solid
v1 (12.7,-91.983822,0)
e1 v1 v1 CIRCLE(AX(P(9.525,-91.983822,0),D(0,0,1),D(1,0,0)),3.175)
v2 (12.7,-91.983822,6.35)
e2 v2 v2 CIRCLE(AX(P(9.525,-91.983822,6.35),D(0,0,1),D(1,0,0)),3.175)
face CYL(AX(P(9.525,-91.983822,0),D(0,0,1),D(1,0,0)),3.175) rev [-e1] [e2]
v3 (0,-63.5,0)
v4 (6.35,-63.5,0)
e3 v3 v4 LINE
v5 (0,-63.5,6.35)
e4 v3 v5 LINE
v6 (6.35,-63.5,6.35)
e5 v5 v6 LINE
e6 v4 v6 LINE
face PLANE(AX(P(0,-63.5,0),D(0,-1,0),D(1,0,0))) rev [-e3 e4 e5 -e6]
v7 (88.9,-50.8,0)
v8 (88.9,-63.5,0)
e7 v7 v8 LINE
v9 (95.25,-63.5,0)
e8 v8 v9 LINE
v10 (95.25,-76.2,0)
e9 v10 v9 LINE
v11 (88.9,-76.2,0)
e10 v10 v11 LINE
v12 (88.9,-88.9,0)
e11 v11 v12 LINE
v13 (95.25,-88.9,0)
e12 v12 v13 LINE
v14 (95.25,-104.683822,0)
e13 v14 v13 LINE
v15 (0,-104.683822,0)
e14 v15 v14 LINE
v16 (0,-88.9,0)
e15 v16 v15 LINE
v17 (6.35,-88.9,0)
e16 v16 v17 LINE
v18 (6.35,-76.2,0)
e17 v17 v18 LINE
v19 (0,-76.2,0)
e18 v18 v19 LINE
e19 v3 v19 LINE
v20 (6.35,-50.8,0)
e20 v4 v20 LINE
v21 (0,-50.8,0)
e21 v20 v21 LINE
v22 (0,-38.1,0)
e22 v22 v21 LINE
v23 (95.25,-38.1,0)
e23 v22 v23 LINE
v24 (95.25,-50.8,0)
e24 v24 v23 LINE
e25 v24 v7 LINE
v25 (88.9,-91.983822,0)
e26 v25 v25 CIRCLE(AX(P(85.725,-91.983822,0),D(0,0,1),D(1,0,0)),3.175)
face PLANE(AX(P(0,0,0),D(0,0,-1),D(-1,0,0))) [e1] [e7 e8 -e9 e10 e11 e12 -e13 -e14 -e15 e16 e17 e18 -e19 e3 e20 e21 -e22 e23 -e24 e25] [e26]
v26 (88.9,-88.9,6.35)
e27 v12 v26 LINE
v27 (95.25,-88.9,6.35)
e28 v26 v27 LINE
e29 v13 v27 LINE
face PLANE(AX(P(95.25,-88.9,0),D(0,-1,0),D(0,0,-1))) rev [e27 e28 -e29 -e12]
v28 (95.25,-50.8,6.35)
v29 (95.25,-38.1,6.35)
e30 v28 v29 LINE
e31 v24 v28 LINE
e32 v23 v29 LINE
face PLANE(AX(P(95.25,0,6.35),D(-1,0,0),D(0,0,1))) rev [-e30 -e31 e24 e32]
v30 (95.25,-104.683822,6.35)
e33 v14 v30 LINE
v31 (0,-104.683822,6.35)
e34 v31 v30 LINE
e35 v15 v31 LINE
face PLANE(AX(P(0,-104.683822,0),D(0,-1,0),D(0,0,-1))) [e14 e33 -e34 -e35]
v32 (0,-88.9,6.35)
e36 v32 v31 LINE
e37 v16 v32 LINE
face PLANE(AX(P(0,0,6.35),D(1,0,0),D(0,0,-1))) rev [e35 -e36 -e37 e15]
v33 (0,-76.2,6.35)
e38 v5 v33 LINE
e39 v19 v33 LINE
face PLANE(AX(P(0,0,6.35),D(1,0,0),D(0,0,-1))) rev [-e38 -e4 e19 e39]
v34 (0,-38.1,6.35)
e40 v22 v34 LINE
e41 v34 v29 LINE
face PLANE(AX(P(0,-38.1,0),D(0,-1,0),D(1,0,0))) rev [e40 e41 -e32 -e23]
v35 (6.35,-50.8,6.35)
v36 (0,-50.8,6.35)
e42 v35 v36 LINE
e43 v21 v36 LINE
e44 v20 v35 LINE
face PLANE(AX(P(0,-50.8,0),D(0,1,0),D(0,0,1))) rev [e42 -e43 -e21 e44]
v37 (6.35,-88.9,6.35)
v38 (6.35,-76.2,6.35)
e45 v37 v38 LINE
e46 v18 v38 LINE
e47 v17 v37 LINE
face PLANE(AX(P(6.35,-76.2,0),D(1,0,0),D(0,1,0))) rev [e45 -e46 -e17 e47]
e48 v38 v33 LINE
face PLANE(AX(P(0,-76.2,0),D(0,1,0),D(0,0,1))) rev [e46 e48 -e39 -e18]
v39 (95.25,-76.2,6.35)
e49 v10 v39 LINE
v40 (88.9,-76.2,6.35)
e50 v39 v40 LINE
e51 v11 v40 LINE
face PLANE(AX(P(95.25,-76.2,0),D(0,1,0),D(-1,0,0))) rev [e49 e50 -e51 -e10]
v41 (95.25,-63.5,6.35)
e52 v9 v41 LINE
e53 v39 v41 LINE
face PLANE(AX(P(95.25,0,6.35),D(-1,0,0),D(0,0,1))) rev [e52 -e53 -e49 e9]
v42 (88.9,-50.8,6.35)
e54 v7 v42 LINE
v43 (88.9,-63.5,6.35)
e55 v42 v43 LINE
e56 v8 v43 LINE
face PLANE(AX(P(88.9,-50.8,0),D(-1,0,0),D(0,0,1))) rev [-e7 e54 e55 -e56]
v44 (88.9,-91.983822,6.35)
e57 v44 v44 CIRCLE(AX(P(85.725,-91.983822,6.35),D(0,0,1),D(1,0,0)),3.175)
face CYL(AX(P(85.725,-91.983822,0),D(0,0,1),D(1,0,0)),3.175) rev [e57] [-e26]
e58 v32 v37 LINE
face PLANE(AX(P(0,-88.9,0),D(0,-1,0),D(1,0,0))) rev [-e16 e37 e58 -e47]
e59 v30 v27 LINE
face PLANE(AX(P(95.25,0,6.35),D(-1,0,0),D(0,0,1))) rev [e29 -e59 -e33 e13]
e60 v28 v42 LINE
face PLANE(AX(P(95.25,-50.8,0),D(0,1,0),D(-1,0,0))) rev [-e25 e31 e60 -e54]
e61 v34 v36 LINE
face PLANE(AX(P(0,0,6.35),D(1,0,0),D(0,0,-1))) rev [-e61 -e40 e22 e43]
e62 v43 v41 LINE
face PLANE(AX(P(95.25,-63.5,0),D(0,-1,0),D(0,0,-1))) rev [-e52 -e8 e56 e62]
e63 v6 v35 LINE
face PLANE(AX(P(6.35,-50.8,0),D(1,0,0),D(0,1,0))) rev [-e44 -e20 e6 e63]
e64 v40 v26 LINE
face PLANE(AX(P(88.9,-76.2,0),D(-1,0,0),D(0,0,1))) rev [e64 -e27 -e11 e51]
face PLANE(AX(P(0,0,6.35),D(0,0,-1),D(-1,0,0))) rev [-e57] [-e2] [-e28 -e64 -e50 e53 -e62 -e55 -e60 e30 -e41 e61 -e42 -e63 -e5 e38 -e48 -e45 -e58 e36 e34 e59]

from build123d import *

# Parameters (mm, degrees)
SKETCH2_W           = 95.25
SKETCH2_H           = 305.964286483
BOSS_EXTRUDE1_DEPTH = 6.35
SKETCH3_W           = 6.35
SKETCH3_H           = 12.7
CUT_EXTRUDE1_DEPTH  = 321.51057643
LPATTERN1_COUNT     = 12
LPATTERN1_PITCH     = 25.4
SKETCH4_W           = 15.875
SKETCH4_H           = 6.374255968
SKETCH4_W_2         = 12.7
CUT_EXTRUDE2_DEPTH  = 321.51057643
SKETCH5_W           = 12.7
SKETCH5_H           = 6.929808982
CUT_EXTRUDE3_DEPTH  = 321.51057643
SKETCH8_W           = 95.25
SKETCH8_H           = 0.555553013
CUT_EXTRUDE5_DEPTH  = 321.51057643
SKETCH9_W           = 69.85
SKETCH9_H           = 248.088941691
BOSS_EXTRUDE3_DEPTH = 6.35
CUT_EXTRUDE8_DEPTH  = 321.51057643
FILL_PATTERN1_DEPTH = 6.35
SKETCH9_2_W         = 69.85
SKETCH9_2_H         = 248.088941691
CUT_EXTRUDE9_DEPTH  = 6.35
SKETCH14_W          = 69.85
SKETCH14_H          = 51.238941691
BOSS_EXTRUDE4_DEPTH = 6.35
SKETCH15_W          = 69.85
SKETCH15_H          = 44.888941691
CUT_EXTRUDE11_DEPTH = 6.35
CHAMFER1_SIZE       = 3.175
SKETCH17_W          = 69.85
SKETCH17_H          = 6.35
BOSS_EXTRUDE5_DEPTH = 6.35
SKETCH18_W          = 69.85
SKETCH18_H          = 44.45
CUT_EXTRUDE12_DEPTH = 321.51057643
CHAMFER2_SIZE       = 3.175
SKETCH19_W          = 95.25
SKETCH19_H          = 105.239375395
BOSS_EXTRUDE6_DEPTH = 6.35
LPATTERN2_COUNT     = 5
LPATTERN2_PITCH     = 25.4
SKETCH20_R          = 3.175
CUT_EXTRUDE13_DEPTH = 321.51057643
SKETCH22_R          = 1.75
CUT_EXTRUDE14_DEPTH = 321.51057643
SKETCH23_W          = 95.25
SKETCH23_H          = 344.064286483
CUT_EXTRUDE15_DEPTH = 321.51057643


# Read off the part's stored shape, not the designer's step: Fill Pattern1
with BuildPart() as part:
    # Sketch2 → Boss-Extrude1 (new body)
    with BuildSketch(Plane.XY):
        with Locations((47.625, 152.982143242)):
            Rectangle(SKETCH2_W, SKETCH2_H)
    extrude(amount=BOSS_EXTRUDE1_DEPTH)

    # Sketch3 → Cut-Extrude1 (cut, through all)
    with BuildSketch(Plane.XY.offset(6.35)):
        with Locations((3.175, 19.05)):
            Rectangle(SKETCH3_W, SKETCH3_H)
        with Locations((92.075, 19.05)):
            Rectangle(SKETCH3_W, SKETCH3_H)
    cut_extrude1 = extrude(amount=-CUT_EXTRUDE1_DEPTH, mode=Mode.SUBTRACT)

    # LPattern1: Cut-Extrude1 ×12
    with Locations(*[(0, i * LPATTERN1_PITCH, 0) for i in range(1, LPATTERN1_COUNT)]):
        add(cut_extrude1, mode=Mode.SUBTRACT)

    # Sketch4 → Cut-Extrude2 (cut, through all)
    with BuildSketch(Plane.XY.offset(6.35)):
        with Locations((7.9375, 302.777158499)):
            Rectangle(SKETCH4_W, SKETCH4_H)
        with Locations((34.925, 302.777158499)):
            Rectangle(SKETCH4_W_2, SKETCH4_H)
        with Locations((87.3125, 302.777158499)):
            Rectangle(SKETCH4_W, SKETCH4_H)
        with Locations((60.325, 302.777158499)):
            Rectangle(SKETCH4_W_2, SKETCH4_H)
    extrude(amount=-CUT_EXTRUDE2_DEPTH, mode=Mode.SUBTRACT)

    # Sketch5 → Cut-Extrude3 (cut, through all)
    with BuildSketch(Plane.XY.offset(6.35)):
        with Locations((22.225, 35.336184333)):
            Rectangle(SKETCH5_W, SKETCH5_H)
        with Locations((47.625, 35.336184333)):
            Rectangle(SKETCH5_W, SKETCH5_H)
        with Locations((73.025, 35.336184333)):
            Rectangle(SKETCH5_W, SKETCH5_H)
    extrude(amount=-CUT_EXTRUDE3_DEPTH, mode=Mode.SUBTRACT)

    # Sketch8 → Cut-Extrude5 (cut, through all)
    with BuildSketch(Plane.XY.offset(6.35)):
        with Locations((47.625, 0.277776507)):
            Rectangle(SKETCH8_W, SKETCH8_H)
    extrude(amount=-CUT_EXTRUDE5_DEPTH, mode=Mode.SUBTRACT)

    # Sketch9<2> → Cut-Extrude9 (cut)
    with BuildSketch(Plane.XY.offset(6.35)):
        with Locations((47.625, 169.195559669)):
            Rectangle(SKETCH9_2_W, SKETCH9_2_H)
    extrude(amount=-CUT_EXTRUDE9_DEPTH, mode=Mode.SUBTRACT)


with BuildPart() as body_2:
    # Sketch9 → Boss-Extrude3 (new body)
    with BuildSketch(Plane.XY.offset(6.35)):
        with Locations((47.625, 169.195559669)):
            Rectangle(SKETCH9_W, SKETCH9_H)
    extrude(amount=-BOSS_EXTRUDE3_DEPTH)

    # Sketch12 → Cut-Extrude8 (cut, through all)
    with BuildSketch(Plane.XY.offset(6.35)):
        Polygon((42.125738686, 280.540030515), (36.626477372, 271.015030515), (42.125738686, 261.490030515), (53.124261314, 261.490030515), (58.623522628, 271.015030515), (53.124261314, 280.540030515), align=None)
    extrude(amount=-CUT_EXTRUDE8_DEPTH, mode=Mode.SUBTRACT)

    # Fill Pattern1 outline → Fill Pattern1 (cut)
    with BuildSketch(Plane.XY):
        Polygon((75.12130657, 223.390030515), (80.620567884, 232.915030515), (75.12130657, 242.440030515), (64.122783942, 242.440030515), (58.623522628, 232.915030515), (64.122783942, 223.390030515), align=None)
        Polygon((20.12869343, 223.390030515), (31.127216058, 223.390030515), (36.626477372, 232.915030515), (31.127216058, 242.440030515), (20.12869343, 242.440030515), (14.629432116, 232.915030515), align=None)
        Polygon((12.7, 198.156904969), (12.7, 191.47315606), (14.629432116, 194.815030515), align=None)
        Polygon((14.629432116, 169.415030515), (12.7, 172.756904969), (12.7, 166.07315606), align=None)
        Polygon((12.7, 223.556904969), (12.7, 216.87315606), (14.629432116, 220.215030515), align=None)
        Polygon((14.629432116, 144.015030515), (12.7, 147.356904969), (12.7, 140.67315606), align=None)
        Polygon((12.7, 248.956904969), (12.7, 242.27315606), (14.629432116, 245.615030515), align=None)
        Polygon((14.629432116, 118.615030515), (12.7, 121.956904969), (12.7, 115.27315606), align=None)
        Polygon((12.7, 274.356904969), (12.7, 267.67315606), (14.629432116, 271.015030515), align=None)
        Polygon((14.629432116, 93.215030515), (12.7, 96.556904969), (12.7, 89.87315606), align=None)
        Polygon((12.7, 293.240030515), (12.7, 293.07315606), (12.796345011, 293.240030515), align=None)
        Polygon((14.629432116, 67.815030515), (12.7, 71.156904969), (12.7, 64.47315606), align=None)
        Polygon((31.127216058, 293.240030515), (20.12869343, 293.240030515), (14.629432116, 283.715030515), (20.12869343, 274.190030515), (31.127216058, 274.190030515), (36.626477372, 283.715030515), align=None)
        Polygon((56.790435523, 293.240030515), (38.459564477, 293.240030515), (42.125738686, 286.890030515), (53.124261314, 286.890030515), align=None)
        Polygon((42.125738686, 51.940030515), (38.206141373, 45.151088824), (57.043858627, 45.151088824), (53.124261314, 51.940030515), align=None)
        Polygon((75.12130657, 293.240030515), (64.122783942, 293.240030515), (58.623522628, 283.715030515), (64.122783942, 274.190030515), (75.12130657, 274.190030515), (80.620567884, 283.715030515), align=None)
        Polygon((82.55, 45.756904969), (82.200231885, 45.151088824), (82.55, 45.151088824), align=None)
        Polygon((82.55, 293.240030515), (82.453654989, 293.240030515), (82.55, 293.07315606), align=None)
        Polygon((80.620567884, 67.815030515), (82.55, 64.47315606), (82.55, 71.156904969), align=None)
        Polygon((82.55, 267.67315606), (82.55, 274.356904969), (80.620567884, 271.015030515), align=None)
        Polygon((80.620567884, 93.215030515), (82.55, 89.87315606), (82.55, 96.556904969), align=None)
        Polygon((82.55, 242.27315606), (82.55, 248.956904969), (80.620567884, 245.615030515), align=None)
        Polygon((80.620567884, 118.615030515), (82.55, 115.27315606), (82.55, 121.956904969), align=None)
        Polygon((82.55, 216.87315606), (82.55, 223.556904969), (80.620567884, 220.215030515), align=None)
        Polygon((80.620567884, 144.015030515), (82.55, 140.67315606), (82.55, 147.356904969), align=None)
        Polygon((82.55, 191.47315606), (82.55, 198.156904969), (80.620567884, 194.815030515), align=None)
        Polygon((80.620567884, 169.415030515), (82.55, 166.07315606), (82.55, 172.756904969), align=None)
        Polygon((20.12869343, 248.790030515), (31.127216058, 248.790030515), (36.626477372, 258.315030515), (31.127216058, 267.840030515), (20.12869343, 267.840030515), (14.629432116, 258.315030515), align=None)
        Polygon((64.122783942, 267.840030515), (58.623522628, 258.315030515), (64.122783942, 248.790030515), (75.12130657, 248.790030515), (80.620567884, 258.315030515), (75.12130657, 267.840030515), align=None)
        Polygon((42.125738686, 236.090030515), (53.124261314, 236.090030515), (58.623522628, 245.615030515), (53.124261314, 255.140030515), (42.125738686, 255.140030515), (36.626477372, 245.615030515), align=None)
        Polygon((20.12869343, 197.990030515), (31.127216058, 197.990030515), (36.626477372, 207.515030515), (31.127216058, 217.040030515), (20.12869343, 217.040030515), (14.629432116, 207.515030515), align=None)
        Polygon((53.124261314, 204.340030515), (42.125738686, 204.340030515), (36.626477372, 194.815030515), (42.125738686, 185.290030515), (53.124261314, 185.290030515), (58.623522628, 194.815030515), align=None)
        Polygon((31.127216058, 166.240030515), (20.12869343, 166.240030515), (14.629432116, 156.715030515), (20.12869343, 147.190030515), (31.127216058, 147.190030515), (36.626477372, 156.715030515), align=None)
        Polygon((75.12130657, 197.990030515), (80.620567884, 207.515030515), (75.12130657, 217.040030515), (64.122783942, 217.040030515), (58.623522628, 207.515030515), (64.122783942, 197.990030515), align=None)
        Polygon((42.125738686, 210.690030515), (53.124261314, 210.690030515), (58.623522628, 220.215030515), (53.124261314, 229.740030515), (42.125738686, 229.740030515), (36.626477372, 220.215030515), align=None)
        Polygon((20.12869343, 172.590030515), (31.127216058, 172.590030515), (36.626477372, 182.115030515), (31.127216058, 191.640030515), (20.12869343, 191.640030515), (14.629432116, 182.115030515), align=None)
        Polygon((53.124261314, 178.940030515), (42.125738686, 178.940030515), (36.626477372, 169.415030515), (42.125738686, 159.890030515), (53.124261314, 159.890030515), (58.623522628, 169.415030515), align=None)
        Polygon((31.127216058, 140.840030515), (20.12869343, 140.840030515), (14.629432116, 131.315030515), (20.12869343, 121.790030515), (31.127216058, 121.790030515), (36.626477372, 131.315030515), align=None)
        Polygon((75.12130657, 147.190030515), (80.620567884, 156.715030515), (75.12130657, 166.240030515), (64.122783942, 166.240030515), (58.623522628, 156.715030515), (64.122783942, 147.190030515), align=None)
        Polygon((75.12130657, 172.590030515), (80.620567884, 182.115030515), (75.12130657, 191.640030515), (64.122783942, 191.640030515), (58.623522628, 182.115030515), (64.122783942, 172.590030515), align=None)
        Polygon((53.124261314, 153.540030515), (42.125738686, 153.540030515), (36.626477372, 144.015030515), (42.125738686, 134.490030515), (53.124261314, 134.490030515), (58.623522628, 144.015030515), align=None)
        Polygon((31.127216058, 115.440030515), (20.12869343, 115.440030515), (14.629432116, 105.915030515), (20.12869343, 96.390030515), (31.127216058, 96.390030515), (36.626477372, 105.915030515), align=None)
        Polygon((75.12130657, 121.790030515), (80.620567884, 131.315030515), (75.12130657, 140.840030515), (64.122783942, 140.840030515), (58.623522628, 131.315030515), (64.122783942, 121.790030515), align=None)
        Polygon((53.124261314, 128.140030515), (42.125738686, 128.140030515), (36.626477372, 118.615030515), (42.125738686, 109.090030515), (53.124261314, 109.090030515), (58.623522628, 118.615030515), align=None)
        Polygon((31.127216058, 90.040030515), (20.12869343, 90.040030515), (14.629432116, 80.515030515), (20.12869343, 70.990030515), (31.127216058, 70.990030515), (36.626477372, 80.515030515), align=None)
        Polygon((75.12130657, 96.390030515), (80.620567884, 105.915030515), (75.12130657, 115.440030515), (64.122783942, 115.440030515), (58.623522628, 105.915030515), (64.122783942, 96.390030515), align=None)
        Polygon((53.124261314, 102.740030515), (42.125738686, 102.740030515), (36.626477372, 93.215030515), (42.125738686, 83.690030515), (53.124261314, 83.690030515), (58.623522628, 93.215030515), align=None)
        Polygon((31.127216058, 64.640030515), (20.12869343, 64.640030515), (14.629432116, 55.115030515), (20.12869343, 45.590030515), (31.127216058, 45.590030515), (36.626477372, 55.115030515), align=None)
        Polygon((75.12130657, 70.990030515), (80.620567884, 80.515030515), (75.12130657, 90.040030515), (64.122783942, 90.040030515), (58.623522628, 80.515030515), (64.122783942, 70.990030515), align=None)
        Polygon((53.124261314, 77.340030515), (42.125738686, 77.340030515), (36.626477372, 67.815030515), (42.125738686, 58.290030515), (53.124261314, 58.290030515), (58.623522628, 67.815030515), align=None)
        Polygon((75.12130657, 45.590030515), (80.620567884, 55.115030515), (75.12130657, 64.640030515), (64.122783942, 64.640030515), (58.623522628, 55.115030515), (64.122783942, 45.590030515), align=None)
    extrude(amount=FILL_PATTERN1_DEPTH, mode=Mode.SUBTRACT)

    # Combine1: union part
    add(part.part)

    # Sketch14 → Boss-Extrude4 (add, through all)
    with BuildSketch(Plane.XY.offset(6.35)):
        with Locations((47.625, 70.77055967)):
            Rectangle(SKETCH14_W, SKETCH14_H)
    extrude(amount=-BOSS_EXTRUDE4_DEPTH)

    # Sketch15 → Cut-Extrude11 (cut)
    with BuildSketch(Plane.XY.offset(6.35)):
        with Locations((47.625, 67.59555967)):
            Rectangle(SKETCH15_W, SKETCH15_H)
    extrude(amount=-CUT_EXTRUDE11_DEPTH, mode=Mode.SUBTRACT)

    # Chamfer1
    chamfer1_edges = [body_2.edges().sort_by_distance(p)[0] for p in [
        (12.7, 45.151088824, 3.175),
        (12.7, 90.040030515, 3.175),
        (82.55, 90.040030515, 3.175),
        (82.55, 45.151088824, 3.175),
    ]]
    chamfer(chamfer1_edges, length=CHAMFER1_SIZE)

    # Sketch17 → Boss-Extrude5 (add, through all)
    with BuildSketch(Plane.XY.offset(6.35)):
        with Locations((47.625, 245.615030515)):
            Rectangle(SKETCH17_W, SKETCH17_H)
    extrude(amount=-BOSS_EXTRUDE5_DEPTH)

    # Sketch18 → Cut-Extrude12 (cut, through all)
    with BuildSketch(Plane.XY.offset(6.35)):
        with Locations((47.625, 271.015030515)):
            Rectangle(SKETCH18_W, SKETCH18_H)
    extrude(amount=-CUT_EXTRUDE12_DEPTH, mode=Mode.SUBTRACT)

    # Chamfer2
    chamfer2_edges = [body_2.edges().sort_by_distance(p)[0] for p in [
        (82.55, 293.240030515, 3.175),
        (12.7, 293.240030515, 3.175),
        (12.7, 248.790030515, 3.175),
        (82.55, 248.790030515, 3.175),
    ]]
    chamfer(chamfer2_edges, length=CHAMFER2_SIZE)

    # Sketch19 → Boss-Extrude6 (add)
    with BuildSketch(Plane.XY.offset(6.35)):
        with Locations((47.625, -52.064134685)):
            Rectangle(SKETCH19_W, SKETCH19_H)
    extrude(amount=-BOSS_EXTRUDE6_DEPTH)

    # LPattern2: Cut-Extrude1 ×5
    with Locations(*[(0, -i * LPATTERN2_PITCH, 0) for i in range(1, LPATTERN2_COUNT)]):
        add(cut_extrude1, mode=Mode.SUBTRACT)

    # Sketch20 → Cut-Extrude13 (cut, through all)
    with BuildSketch(Plane.XY.offset(6.35)):
        with Locations((9.525, -91.983822382)):
            Circle(SKETCH20_R)
        with Locations((85.725, -91.983822382)):
            Circle(SKETCH20_R)
    extrude(amount=-CUT_EXTRUDE13_DEPTH, mode=Mode.SUBTRACT)

    # Sketch22 → Cut-Extrude14 (cut, through all)
    with BuildSketch(Plane.XY.offset(6.35)):
        with Locations((25.4, 0)):
            Circle(SKETCH22_R)
        with Locations((69.85, 0)):
            Circle(SKETCH22_R)
    extrude(amount=-CUT_EXTRUDE14_DEPTH, mode=Mode.SUBTRACT)

    # Sketch23 → Cut-Extrude15 (cut, through all)
    with BuildSketch(Plane.XY.offset(6.35)):
        with Locations((47.625, 133.932143242)):
            Rectangle(SKETCH23_W, SKETCH23_H)
    extrude(amount=-CUT_EXTRUDE15_DEPTH, mode=Mode.SUBTRACT)


solid = body_2.part
